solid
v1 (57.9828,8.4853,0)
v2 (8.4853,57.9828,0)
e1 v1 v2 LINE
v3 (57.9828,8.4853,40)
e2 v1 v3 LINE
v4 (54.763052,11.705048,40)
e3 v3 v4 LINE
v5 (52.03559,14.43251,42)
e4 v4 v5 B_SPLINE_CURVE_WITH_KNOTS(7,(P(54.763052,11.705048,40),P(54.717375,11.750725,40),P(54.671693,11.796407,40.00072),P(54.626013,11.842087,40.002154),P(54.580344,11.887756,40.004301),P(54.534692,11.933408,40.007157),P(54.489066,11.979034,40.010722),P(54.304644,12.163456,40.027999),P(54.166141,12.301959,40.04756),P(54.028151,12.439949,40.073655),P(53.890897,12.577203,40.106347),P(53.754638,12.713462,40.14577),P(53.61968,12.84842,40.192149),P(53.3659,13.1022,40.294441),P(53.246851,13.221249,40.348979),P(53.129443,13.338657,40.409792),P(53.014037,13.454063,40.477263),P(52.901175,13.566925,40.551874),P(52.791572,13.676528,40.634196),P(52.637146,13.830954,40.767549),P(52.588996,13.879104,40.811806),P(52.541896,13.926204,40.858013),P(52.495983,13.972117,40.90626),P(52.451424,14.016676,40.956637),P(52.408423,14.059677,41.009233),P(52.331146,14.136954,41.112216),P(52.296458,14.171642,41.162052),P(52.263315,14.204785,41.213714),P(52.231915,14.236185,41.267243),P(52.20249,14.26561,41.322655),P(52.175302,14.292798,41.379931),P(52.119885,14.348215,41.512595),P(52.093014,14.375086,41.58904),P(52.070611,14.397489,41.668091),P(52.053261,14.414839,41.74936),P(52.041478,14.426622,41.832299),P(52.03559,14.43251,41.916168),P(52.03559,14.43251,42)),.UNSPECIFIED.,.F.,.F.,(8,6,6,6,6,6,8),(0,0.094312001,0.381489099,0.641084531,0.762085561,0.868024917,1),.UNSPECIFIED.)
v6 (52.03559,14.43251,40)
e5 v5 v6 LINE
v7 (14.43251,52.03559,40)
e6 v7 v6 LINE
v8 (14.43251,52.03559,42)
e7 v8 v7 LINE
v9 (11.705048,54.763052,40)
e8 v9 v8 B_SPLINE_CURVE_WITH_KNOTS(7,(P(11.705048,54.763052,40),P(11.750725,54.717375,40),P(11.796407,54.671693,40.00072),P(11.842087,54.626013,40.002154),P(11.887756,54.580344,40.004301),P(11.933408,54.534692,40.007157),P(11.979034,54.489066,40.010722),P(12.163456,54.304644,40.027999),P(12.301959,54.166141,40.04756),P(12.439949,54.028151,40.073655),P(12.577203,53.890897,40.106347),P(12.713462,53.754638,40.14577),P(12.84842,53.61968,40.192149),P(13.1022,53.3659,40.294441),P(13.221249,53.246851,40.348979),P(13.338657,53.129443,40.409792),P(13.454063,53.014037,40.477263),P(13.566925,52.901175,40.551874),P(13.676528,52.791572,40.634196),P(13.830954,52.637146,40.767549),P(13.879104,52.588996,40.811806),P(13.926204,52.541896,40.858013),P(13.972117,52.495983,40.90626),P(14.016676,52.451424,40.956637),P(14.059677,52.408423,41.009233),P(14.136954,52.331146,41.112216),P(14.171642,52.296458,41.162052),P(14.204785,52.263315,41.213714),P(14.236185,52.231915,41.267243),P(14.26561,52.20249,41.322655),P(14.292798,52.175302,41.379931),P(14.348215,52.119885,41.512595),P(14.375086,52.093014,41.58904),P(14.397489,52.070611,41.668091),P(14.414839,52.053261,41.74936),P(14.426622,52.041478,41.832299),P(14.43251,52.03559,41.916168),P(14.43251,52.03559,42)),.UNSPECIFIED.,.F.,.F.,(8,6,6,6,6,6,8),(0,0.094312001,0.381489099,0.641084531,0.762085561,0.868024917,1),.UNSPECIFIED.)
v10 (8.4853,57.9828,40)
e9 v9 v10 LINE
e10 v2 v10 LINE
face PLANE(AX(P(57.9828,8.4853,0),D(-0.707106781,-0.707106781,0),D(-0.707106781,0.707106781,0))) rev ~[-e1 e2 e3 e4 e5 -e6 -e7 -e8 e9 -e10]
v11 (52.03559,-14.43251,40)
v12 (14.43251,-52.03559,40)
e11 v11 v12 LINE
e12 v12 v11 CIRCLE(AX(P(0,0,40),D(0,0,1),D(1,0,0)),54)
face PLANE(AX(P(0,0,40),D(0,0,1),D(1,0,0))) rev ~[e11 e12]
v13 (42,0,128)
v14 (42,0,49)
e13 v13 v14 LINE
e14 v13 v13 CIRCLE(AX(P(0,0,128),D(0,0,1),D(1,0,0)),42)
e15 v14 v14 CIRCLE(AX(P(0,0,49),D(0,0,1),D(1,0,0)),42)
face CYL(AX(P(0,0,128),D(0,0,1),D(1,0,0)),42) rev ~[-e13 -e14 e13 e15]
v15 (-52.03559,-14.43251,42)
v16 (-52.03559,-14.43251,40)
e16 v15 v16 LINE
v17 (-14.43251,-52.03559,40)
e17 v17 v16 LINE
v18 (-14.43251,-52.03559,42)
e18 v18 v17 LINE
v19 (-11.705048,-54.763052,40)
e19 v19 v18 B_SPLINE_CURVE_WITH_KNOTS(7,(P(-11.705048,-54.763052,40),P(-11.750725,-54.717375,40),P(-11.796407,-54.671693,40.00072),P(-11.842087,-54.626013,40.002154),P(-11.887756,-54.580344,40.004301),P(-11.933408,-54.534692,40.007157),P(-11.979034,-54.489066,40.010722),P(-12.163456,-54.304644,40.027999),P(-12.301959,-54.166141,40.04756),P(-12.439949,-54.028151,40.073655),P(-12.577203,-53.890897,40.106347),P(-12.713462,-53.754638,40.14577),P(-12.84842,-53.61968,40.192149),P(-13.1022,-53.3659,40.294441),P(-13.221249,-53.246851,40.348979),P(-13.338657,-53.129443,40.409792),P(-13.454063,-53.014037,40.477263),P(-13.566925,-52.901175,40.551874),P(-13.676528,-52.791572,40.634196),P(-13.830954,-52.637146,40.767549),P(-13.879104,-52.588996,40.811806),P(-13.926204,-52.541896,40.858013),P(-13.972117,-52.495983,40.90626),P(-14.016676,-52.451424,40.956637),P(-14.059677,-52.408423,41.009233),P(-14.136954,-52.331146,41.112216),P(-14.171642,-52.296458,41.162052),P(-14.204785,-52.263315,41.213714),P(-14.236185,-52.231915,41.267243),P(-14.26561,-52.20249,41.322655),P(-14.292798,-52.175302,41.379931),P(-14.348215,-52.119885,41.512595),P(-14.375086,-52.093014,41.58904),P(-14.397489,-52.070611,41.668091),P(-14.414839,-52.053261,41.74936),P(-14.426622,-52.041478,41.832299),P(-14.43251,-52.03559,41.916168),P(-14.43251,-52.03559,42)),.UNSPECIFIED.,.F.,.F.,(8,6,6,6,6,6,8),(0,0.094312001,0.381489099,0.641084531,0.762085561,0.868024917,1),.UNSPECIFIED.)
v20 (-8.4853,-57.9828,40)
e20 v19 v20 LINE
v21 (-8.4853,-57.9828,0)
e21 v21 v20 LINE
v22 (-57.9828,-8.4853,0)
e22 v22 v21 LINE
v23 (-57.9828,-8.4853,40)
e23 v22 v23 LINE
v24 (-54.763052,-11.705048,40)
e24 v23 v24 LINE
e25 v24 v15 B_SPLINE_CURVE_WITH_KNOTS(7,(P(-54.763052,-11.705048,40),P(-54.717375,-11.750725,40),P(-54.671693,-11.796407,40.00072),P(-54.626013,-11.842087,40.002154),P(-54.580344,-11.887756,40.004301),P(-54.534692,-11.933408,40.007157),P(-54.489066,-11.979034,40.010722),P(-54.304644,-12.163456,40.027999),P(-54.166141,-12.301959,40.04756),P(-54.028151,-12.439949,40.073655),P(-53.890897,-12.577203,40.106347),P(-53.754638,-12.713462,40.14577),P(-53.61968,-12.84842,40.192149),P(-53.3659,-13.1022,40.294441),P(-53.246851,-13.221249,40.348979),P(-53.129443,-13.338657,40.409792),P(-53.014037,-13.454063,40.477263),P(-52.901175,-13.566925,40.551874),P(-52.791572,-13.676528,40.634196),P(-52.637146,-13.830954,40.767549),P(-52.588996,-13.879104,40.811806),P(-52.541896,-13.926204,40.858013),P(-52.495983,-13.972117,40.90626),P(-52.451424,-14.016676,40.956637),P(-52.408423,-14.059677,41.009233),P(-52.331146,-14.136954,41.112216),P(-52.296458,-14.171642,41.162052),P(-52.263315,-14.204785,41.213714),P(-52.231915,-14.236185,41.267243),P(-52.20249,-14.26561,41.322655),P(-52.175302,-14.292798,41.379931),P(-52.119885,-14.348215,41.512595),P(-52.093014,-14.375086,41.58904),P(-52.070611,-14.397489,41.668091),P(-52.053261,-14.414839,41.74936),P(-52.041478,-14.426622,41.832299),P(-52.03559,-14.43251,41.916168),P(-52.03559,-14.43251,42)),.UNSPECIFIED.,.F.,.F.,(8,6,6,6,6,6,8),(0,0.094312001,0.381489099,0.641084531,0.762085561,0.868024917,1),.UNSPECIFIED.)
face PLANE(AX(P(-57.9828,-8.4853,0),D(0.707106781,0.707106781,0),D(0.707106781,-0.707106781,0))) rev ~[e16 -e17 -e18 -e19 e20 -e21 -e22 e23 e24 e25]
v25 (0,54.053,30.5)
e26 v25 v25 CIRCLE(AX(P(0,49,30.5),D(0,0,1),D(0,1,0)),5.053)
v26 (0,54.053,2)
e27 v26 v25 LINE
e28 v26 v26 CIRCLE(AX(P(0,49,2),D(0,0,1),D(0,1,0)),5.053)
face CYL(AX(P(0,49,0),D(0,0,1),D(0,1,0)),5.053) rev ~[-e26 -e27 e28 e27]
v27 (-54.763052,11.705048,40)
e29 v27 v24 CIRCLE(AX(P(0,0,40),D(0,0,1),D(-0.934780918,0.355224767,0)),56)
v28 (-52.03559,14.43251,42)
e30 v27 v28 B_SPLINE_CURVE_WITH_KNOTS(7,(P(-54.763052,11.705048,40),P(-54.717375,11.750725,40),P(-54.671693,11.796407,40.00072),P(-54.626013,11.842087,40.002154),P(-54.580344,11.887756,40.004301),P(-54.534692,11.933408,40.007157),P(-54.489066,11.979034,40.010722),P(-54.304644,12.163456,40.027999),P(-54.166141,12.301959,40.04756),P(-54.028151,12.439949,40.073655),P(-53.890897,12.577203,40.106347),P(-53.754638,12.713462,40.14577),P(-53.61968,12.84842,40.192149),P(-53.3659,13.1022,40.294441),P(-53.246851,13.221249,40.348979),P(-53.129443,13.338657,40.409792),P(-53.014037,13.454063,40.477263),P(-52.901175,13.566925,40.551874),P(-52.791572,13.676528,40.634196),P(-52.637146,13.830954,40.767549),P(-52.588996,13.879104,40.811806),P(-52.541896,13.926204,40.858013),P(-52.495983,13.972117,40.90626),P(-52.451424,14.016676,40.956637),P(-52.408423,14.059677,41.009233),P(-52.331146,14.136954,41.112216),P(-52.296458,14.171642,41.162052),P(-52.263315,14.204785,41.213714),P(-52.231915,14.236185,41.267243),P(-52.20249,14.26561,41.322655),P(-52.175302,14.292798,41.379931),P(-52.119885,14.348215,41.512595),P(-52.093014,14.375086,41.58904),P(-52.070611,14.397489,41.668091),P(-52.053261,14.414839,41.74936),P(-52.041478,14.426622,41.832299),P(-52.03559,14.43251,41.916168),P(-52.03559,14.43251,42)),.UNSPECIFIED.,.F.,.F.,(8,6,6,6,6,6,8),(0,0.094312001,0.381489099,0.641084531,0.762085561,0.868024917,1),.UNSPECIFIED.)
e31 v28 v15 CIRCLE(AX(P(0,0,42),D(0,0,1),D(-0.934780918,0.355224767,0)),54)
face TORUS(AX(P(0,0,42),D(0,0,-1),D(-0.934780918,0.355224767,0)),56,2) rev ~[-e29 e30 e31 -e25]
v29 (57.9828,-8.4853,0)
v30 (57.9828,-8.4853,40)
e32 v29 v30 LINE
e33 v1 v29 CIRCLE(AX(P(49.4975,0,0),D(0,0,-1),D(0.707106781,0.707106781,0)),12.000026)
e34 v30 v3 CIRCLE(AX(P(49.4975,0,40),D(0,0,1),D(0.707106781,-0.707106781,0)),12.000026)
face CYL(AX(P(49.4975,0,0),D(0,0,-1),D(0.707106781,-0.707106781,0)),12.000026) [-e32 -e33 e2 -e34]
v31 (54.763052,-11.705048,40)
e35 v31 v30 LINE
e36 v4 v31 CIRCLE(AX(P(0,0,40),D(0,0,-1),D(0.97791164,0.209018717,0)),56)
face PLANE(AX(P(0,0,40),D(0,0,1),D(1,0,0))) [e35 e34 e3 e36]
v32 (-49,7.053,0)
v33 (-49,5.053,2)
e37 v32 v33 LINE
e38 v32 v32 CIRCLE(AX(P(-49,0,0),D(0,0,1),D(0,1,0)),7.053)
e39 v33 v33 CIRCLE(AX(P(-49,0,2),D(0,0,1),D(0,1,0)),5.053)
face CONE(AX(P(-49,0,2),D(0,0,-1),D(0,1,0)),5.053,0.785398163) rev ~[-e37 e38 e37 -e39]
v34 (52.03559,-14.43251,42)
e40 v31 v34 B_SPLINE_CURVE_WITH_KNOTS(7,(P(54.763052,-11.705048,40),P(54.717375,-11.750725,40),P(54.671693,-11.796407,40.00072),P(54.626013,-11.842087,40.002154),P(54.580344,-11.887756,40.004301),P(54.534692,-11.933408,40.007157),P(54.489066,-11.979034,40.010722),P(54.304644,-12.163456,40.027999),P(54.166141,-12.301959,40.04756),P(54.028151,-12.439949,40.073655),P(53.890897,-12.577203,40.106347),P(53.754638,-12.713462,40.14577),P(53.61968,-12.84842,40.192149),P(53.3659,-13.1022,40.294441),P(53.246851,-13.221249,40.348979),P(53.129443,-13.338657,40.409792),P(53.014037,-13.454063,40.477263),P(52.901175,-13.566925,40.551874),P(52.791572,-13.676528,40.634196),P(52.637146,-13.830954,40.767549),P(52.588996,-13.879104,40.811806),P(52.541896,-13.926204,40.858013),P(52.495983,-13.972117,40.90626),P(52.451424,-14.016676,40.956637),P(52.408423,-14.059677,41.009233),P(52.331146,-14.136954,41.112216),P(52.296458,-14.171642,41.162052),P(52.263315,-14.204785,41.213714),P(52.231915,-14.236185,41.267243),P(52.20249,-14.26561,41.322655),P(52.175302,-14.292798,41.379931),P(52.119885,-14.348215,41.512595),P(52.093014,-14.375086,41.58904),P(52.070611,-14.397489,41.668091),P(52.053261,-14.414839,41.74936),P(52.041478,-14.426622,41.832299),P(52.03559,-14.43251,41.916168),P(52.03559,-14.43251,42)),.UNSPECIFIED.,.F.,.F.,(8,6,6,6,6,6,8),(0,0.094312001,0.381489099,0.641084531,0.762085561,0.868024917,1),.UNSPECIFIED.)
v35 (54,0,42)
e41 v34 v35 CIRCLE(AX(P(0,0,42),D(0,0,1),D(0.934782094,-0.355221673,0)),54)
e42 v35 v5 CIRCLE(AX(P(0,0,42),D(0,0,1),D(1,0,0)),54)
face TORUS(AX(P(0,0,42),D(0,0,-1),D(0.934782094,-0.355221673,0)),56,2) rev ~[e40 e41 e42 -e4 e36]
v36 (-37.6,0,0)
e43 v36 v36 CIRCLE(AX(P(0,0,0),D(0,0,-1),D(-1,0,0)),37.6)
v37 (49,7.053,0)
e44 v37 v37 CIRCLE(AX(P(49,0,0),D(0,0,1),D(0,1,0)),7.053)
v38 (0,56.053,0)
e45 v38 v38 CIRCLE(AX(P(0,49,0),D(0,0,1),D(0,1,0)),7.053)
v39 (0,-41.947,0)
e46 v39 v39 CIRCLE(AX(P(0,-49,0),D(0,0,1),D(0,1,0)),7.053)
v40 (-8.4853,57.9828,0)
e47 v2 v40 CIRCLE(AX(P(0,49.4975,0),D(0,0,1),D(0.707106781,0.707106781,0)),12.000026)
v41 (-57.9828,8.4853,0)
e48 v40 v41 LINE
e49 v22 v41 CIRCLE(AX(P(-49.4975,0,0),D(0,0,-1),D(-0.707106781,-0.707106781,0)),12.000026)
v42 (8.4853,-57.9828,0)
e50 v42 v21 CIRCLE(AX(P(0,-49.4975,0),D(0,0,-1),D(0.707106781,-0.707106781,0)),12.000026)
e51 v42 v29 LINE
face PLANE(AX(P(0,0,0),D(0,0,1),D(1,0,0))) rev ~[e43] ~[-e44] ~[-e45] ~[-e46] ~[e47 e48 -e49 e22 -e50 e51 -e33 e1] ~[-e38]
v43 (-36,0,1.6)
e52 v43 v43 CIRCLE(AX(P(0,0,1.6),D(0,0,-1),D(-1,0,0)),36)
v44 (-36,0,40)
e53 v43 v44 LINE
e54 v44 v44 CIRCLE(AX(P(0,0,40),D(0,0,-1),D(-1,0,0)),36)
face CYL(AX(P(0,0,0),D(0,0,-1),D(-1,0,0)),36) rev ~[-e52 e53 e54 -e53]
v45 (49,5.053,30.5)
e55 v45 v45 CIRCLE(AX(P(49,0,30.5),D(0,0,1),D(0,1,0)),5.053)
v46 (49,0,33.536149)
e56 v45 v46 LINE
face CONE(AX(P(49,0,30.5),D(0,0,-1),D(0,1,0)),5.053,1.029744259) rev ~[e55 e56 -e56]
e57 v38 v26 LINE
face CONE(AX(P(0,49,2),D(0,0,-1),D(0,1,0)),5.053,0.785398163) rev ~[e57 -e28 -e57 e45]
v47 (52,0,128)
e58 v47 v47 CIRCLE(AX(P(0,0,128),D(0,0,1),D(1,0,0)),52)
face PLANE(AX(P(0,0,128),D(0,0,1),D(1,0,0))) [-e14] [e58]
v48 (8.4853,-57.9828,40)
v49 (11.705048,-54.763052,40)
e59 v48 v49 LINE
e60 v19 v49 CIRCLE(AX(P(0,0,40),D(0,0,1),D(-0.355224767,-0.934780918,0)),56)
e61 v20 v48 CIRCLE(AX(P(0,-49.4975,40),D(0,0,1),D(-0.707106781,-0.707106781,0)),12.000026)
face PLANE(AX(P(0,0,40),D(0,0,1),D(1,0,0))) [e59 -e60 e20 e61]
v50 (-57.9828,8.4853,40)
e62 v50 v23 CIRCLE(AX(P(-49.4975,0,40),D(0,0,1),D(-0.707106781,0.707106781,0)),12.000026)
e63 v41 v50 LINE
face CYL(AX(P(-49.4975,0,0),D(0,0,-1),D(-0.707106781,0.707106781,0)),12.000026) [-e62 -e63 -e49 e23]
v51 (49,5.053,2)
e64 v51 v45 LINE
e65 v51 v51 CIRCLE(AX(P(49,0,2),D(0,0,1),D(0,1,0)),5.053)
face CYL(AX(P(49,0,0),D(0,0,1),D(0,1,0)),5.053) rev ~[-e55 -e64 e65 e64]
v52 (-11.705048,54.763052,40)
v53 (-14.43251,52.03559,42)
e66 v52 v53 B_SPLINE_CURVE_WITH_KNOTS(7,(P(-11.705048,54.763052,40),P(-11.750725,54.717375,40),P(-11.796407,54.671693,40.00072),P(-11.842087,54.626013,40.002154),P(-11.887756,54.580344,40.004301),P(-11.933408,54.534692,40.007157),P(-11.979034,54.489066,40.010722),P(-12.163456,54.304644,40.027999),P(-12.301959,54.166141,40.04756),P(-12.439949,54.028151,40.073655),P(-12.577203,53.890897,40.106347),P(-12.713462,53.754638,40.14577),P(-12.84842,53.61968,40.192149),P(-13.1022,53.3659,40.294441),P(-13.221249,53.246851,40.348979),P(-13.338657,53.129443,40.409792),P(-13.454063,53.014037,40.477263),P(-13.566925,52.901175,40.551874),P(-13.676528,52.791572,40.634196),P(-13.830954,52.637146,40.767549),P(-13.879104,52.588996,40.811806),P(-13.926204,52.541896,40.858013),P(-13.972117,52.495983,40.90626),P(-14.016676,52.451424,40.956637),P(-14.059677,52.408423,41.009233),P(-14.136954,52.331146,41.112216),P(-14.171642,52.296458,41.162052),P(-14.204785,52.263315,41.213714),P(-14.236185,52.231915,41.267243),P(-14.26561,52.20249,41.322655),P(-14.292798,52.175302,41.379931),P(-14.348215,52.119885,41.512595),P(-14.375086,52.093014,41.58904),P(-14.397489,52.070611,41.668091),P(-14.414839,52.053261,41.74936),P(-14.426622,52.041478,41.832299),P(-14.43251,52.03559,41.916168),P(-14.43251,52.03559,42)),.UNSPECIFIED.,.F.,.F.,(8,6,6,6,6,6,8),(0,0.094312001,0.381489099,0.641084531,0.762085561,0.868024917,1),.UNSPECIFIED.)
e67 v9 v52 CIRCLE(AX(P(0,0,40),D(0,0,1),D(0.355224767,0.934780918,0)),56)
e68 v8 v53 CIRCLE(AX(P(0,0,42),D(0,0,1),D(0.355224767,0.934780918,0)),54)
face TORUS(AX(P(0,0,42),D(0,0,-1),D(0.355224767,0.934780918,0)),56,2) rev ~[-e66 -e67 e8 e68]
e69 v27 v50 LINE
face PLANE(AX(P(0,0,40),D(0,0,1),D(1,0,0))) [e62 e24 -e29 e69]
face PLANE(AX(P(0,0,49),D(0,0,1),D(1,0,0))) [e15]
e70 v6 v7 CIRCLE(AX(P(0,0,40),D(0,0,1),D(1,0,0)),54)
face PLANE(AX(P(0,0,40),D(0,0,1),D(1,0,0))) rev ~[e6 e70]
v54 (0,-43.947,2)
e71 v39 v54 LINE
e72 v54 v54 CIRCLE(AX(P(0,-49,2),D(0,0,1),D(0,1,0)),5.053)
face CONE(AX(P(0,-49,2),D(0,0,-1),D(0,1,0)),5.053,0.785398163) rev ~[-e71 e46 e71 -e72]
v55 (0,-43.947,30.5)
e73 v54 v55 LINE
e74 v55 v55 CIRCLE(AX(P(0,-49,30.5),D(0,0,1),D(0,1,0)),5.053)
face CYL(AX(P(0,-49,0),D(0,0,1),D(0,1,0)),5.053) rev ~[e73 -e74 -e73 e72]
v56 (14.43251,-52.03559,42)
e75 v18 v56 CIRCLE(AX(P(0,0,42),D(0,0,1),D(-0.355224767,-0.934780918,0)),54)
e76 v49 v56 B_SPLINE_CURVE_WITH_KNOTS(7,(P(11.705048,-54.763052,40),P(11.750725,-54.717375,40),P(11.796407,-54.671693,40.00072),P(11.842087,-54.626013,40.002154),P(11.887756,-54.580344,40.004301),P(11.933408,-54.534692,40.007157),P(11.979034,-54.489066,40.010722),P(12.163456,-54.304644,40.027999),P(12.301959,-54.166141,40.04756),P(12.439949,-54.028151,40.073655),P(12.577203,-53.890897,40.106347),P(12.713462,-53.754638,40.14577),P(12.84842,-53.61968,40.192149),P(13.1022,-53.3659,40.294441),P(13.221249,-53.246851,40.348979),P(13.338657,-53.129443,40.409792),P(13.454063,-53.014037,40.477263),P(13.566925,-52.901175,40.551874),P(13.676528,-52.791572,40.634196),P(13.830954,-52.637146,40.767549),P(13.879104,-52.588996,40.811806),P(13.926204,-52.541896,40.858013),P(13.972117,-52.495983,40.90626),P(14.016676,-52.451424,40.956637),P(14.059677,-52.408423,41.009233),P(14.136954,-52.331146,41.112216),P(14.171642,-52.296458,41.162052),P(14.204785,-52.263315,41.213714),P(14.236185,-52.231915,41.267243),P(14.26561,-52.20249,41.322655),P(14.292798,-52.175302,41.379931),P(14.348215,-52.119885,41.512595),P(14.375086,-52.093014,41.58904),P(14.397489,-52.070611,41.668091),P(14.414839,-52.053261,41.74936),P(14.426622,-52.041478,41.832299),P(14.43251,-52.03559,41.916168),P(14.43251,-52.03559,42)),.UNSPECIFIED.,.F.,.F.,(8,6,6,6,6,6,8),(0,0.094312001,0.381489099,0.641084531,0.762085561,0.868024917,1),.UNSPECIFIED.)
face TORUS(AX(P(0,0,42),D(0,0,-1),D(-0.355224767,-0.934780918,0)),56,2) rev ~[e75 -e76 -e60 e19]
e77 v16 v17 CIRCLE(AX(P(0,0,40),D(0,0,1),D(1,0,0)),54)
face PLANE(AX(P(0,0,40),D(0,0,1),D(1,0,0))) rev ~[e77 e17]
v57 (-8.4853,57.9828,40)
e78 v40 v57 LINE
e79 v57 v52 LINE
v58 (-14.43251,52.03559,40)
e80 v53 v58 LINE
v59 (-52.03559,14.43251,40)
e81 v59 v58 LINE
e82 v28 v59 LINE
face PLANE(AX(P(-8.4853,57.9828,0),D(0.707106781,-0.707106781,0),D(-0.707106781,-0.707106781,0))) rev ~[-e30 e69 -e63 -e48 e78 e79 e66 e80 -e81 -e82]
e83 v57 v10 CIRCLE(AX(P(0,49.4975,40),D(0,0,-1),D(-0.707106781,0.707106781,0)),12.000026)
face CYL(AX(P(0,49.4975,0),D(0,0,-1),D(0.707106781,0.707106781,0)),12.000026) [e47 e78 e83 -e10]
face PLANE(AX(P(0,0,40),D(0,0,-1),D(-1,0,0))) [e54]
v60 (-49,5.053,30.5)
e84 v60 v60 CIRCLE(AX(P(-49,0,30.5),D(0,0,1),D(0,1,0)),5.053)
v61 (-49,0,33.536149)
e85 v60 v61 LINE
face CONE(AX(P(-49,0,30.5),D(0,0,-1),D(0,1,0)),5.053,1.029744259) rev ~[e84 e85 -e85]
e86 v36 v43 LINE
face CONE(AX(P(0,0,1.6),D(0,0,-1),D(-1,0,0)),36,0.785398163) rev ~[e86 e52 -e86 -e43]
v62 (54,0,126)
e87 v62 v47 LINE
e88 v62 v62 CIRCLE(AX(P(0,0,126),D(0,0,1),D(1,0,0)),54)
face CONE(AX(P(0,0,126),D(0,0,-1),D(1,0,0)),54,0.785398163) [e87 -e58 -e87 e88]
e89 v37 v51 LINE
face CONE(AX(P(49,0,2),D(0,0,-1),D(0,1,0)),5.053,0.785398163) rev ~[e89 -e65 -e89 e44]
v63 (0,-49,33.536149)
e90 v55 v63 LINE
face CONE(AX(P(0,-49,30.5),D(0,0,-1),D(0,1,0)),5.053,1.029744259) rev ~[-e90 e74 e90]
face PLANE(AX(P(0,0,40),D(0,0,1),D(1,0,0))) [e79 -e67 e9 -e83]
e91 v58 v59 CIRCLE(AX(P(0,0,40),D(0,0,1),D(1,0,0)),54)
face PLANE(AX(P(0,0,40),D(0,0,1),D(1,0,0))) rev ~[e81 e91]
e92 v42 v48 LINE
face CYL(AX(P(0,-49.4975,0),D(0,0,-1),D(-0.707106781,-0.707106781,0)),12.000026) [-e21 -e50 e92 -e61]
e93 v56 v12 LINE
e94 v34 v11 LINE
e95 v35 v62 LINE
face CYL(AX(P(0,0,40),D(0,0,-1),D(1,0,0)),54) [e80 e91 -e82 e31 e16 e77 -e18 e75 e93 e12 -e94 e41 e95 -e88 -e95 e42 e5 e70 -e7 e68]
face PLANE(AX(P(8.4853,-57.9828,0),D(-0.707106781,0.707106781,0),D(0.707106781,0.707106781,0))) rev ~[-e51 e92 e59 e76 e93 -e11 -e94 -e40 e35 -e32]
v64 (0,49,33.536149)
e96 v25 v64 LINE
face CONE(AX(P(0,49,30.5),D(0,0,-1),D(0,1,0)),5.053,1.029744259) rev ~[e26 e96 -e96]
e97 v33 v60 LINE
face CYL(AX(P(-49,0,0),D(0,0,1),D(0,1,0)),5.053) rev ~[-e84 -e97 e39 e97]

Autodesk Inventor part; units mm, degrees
ref_plane "YZ Plane" through (0, 0, 0) normal (1, 0, 0) x (0, 1, 0)
ref_plane "XZ Plane" through (0, 0, 0) normal (0, 1, 0) x (-1, 0, 0)
ref_plane "XY Plane" through (0, 0, 0) normal (0, 0, 1) x (1, 0, 0)
sketch "Эскиз1" plane through (0, 0, 0) normal (0, 0, 1) x (1, 0, 0)
  line L0 (-8.4853, 57.9828) -> (-57.9828, 8.4853)
  line L1 (-57.9828, -8.4853) -> (-8.4853, -57.9828)
  line L2 (8.4853, -57.9828) -> (57.9828, -8.4853)
  line L3 (57.9828, 8.4853) -> (8.4853, 57.9828)
  line L4 (-93.0553, 0) -> (93.0553, 0) projected
  line L5 (0, -87.0906) -> (0, 92.0611) projected
  arc A0 (-57.9828, 8.4853) -> (-57.9828, -8.4853) centre (-49.4975, 0) ccw
  arc A1 (8.4853, 57.9828) -> (-8.4853, 57.9828) centre (0, 49.4975) ccw
  arc A2 (57.9828, -8.4853) -> (57.9828, 8.4853) centre (49.4975, 0) ccw
  arc A3 (-8.4853, -57.9828) -> (8.4853, -57.9828) centre (0, -49.4975) ccw
  point P0 (0, 66.468)
  point P1 (-66.468, 0)
  point P2 (66.468, 0)
  dimension "d5" = 94
  dimension "d7" = 94
  dimension "d8" = 12
extrude "Выдавливание1" add sketch "Эскиз1" along normal blind 40
sketch "Эскиз2" plane through (0, 0, 40) normal (0, 0, 1) x (1, 0, 0)
  circle A0 centre (0, 0) radius 54
  dimension "d11" = 108
extrude "Выдавливание2" add sketch "Эскиз2" along normal blind 88
sketch "Эскиз3" plane through (0, 0, 128) normal (0, 0, 1) x (1, 0, 0)
  circle A0 centre (0, 0) radius 42
  dimension "d14" = 84
extrude "Выдавливание3" cut sketch "Эскиз3" against normal blind 79
sketch "Эскиз4" plane through (0, 0, 0) normal (0, 0, -1) x (-1, 0, 0)
  circle A0 centre (0, 0) radius 36
  dimension "d17" = 72
extrude "Выдавливание4" cut sketch "Эскиз4" against normal blind 40
chamfer "Фаска1" distance 2 angle 45 1 edges at (-54, 0, 128)
chamfer "Фаска2" distance 1.6 angle 45 1 edges at (36, 0, 0)
sketch "Эскиз6" plane through (0, 0, 0) normal (0, 0, -1) x (-1, 0, 0)
  circle A0 centre (0, 49) radius 6
  circle A1 centre (0, -49) radius 6
  line L0 (86.0965, 0) -> (-86.0965, 0) projected
  circle A2 centre (49, 0) radius 6
  circle A3 centre (-49, 0) radius 6
  line L1 (0, -86.0965) -> (0, 86.0965) projected
  point P0 (0, 0)
  dimension "d30" = 98
  dimension "d31" = 12
  dimension "d32" = 12
  dimension "d33" = 98
  dimension "d34" = 12
  dimension "d35" = 12
fillet "Сопряжение1" radius 2 5 edges at (0, 54, 40) (-54, 0, 40) (0, -54, 40) (53.5066, -7.2827, 40) (53.5066, 7.2827, 40)
hole "Отверстие1" at (49, 0, 0) direction (0, 0, 1) diameter 10.106 depth 30.5 tip angle 118 thread size "M12x1.75" class "6H" standard "ANSI Metric M Profile"
chamfer "Фаска3" distance 2 angle 45 1 edges at (49, -5.053, 0)
sketch "Эскиз7" plane through (0, 0, 0) normal (0, 0, -1) x (-1, 0, 0)
  circle A0 centre (49, 0) radius 6
  point P0 (0, 0)
  dimension "d47" = 49
  dimension "d48" = 12
hole "Отверстие2" at (-49, 0, 0) direction (0, 0, 1) diameter 10.106 depth 30.5 tip angle 118 thread size "M12x1.75" class "6H" standard "ANSI Metric M Profile"
chamfer "Фаска4" distance 2 angle 45 1 edges at (-49, -5.053, 0)
sketch "Эскиз8" plane through (0, 0, 0) normal (0, 0, -1) x (-1, 0, 0)
  circle A0 centre (0, 49) radius 6
  point P0 (0, 0)
  dimension "d59" = 12
  dimension "d60" = 49
hole "Отверстие3" at (0, 49, 0) direction (0, 0, 1) diameter 10.106 depth 30.5 tip angle 118 thread size "M12x1.75" class "6H" standard "ANSI Metric M Profile"
chamfer "Фаска5" distance 2 angle 45 1 edges at (0, 43.947, 0)
sketch "Эскиз9" plane through (0, 0, 0) normal (0, 0, -1) x (-1, 0, 0)
  circle A0 centre (0, -49) radius 6
  point P0 (0, 0)
  dimension "d71" = 12
  dimension "d72" = 49
hole "Отверстие4" at (0, -49, 0) direction (0, 0, 1) diameter 10.106 depth 30.5 tip angle 118 thread size "M12x1.75" class "6H" standard "ANSI Metric M Profile"
chamfer "Фаска6" distance 2 angle 45 1 edges at (0, -54.053, 0)
properties part number "Пункт 1(чё там считать)"
